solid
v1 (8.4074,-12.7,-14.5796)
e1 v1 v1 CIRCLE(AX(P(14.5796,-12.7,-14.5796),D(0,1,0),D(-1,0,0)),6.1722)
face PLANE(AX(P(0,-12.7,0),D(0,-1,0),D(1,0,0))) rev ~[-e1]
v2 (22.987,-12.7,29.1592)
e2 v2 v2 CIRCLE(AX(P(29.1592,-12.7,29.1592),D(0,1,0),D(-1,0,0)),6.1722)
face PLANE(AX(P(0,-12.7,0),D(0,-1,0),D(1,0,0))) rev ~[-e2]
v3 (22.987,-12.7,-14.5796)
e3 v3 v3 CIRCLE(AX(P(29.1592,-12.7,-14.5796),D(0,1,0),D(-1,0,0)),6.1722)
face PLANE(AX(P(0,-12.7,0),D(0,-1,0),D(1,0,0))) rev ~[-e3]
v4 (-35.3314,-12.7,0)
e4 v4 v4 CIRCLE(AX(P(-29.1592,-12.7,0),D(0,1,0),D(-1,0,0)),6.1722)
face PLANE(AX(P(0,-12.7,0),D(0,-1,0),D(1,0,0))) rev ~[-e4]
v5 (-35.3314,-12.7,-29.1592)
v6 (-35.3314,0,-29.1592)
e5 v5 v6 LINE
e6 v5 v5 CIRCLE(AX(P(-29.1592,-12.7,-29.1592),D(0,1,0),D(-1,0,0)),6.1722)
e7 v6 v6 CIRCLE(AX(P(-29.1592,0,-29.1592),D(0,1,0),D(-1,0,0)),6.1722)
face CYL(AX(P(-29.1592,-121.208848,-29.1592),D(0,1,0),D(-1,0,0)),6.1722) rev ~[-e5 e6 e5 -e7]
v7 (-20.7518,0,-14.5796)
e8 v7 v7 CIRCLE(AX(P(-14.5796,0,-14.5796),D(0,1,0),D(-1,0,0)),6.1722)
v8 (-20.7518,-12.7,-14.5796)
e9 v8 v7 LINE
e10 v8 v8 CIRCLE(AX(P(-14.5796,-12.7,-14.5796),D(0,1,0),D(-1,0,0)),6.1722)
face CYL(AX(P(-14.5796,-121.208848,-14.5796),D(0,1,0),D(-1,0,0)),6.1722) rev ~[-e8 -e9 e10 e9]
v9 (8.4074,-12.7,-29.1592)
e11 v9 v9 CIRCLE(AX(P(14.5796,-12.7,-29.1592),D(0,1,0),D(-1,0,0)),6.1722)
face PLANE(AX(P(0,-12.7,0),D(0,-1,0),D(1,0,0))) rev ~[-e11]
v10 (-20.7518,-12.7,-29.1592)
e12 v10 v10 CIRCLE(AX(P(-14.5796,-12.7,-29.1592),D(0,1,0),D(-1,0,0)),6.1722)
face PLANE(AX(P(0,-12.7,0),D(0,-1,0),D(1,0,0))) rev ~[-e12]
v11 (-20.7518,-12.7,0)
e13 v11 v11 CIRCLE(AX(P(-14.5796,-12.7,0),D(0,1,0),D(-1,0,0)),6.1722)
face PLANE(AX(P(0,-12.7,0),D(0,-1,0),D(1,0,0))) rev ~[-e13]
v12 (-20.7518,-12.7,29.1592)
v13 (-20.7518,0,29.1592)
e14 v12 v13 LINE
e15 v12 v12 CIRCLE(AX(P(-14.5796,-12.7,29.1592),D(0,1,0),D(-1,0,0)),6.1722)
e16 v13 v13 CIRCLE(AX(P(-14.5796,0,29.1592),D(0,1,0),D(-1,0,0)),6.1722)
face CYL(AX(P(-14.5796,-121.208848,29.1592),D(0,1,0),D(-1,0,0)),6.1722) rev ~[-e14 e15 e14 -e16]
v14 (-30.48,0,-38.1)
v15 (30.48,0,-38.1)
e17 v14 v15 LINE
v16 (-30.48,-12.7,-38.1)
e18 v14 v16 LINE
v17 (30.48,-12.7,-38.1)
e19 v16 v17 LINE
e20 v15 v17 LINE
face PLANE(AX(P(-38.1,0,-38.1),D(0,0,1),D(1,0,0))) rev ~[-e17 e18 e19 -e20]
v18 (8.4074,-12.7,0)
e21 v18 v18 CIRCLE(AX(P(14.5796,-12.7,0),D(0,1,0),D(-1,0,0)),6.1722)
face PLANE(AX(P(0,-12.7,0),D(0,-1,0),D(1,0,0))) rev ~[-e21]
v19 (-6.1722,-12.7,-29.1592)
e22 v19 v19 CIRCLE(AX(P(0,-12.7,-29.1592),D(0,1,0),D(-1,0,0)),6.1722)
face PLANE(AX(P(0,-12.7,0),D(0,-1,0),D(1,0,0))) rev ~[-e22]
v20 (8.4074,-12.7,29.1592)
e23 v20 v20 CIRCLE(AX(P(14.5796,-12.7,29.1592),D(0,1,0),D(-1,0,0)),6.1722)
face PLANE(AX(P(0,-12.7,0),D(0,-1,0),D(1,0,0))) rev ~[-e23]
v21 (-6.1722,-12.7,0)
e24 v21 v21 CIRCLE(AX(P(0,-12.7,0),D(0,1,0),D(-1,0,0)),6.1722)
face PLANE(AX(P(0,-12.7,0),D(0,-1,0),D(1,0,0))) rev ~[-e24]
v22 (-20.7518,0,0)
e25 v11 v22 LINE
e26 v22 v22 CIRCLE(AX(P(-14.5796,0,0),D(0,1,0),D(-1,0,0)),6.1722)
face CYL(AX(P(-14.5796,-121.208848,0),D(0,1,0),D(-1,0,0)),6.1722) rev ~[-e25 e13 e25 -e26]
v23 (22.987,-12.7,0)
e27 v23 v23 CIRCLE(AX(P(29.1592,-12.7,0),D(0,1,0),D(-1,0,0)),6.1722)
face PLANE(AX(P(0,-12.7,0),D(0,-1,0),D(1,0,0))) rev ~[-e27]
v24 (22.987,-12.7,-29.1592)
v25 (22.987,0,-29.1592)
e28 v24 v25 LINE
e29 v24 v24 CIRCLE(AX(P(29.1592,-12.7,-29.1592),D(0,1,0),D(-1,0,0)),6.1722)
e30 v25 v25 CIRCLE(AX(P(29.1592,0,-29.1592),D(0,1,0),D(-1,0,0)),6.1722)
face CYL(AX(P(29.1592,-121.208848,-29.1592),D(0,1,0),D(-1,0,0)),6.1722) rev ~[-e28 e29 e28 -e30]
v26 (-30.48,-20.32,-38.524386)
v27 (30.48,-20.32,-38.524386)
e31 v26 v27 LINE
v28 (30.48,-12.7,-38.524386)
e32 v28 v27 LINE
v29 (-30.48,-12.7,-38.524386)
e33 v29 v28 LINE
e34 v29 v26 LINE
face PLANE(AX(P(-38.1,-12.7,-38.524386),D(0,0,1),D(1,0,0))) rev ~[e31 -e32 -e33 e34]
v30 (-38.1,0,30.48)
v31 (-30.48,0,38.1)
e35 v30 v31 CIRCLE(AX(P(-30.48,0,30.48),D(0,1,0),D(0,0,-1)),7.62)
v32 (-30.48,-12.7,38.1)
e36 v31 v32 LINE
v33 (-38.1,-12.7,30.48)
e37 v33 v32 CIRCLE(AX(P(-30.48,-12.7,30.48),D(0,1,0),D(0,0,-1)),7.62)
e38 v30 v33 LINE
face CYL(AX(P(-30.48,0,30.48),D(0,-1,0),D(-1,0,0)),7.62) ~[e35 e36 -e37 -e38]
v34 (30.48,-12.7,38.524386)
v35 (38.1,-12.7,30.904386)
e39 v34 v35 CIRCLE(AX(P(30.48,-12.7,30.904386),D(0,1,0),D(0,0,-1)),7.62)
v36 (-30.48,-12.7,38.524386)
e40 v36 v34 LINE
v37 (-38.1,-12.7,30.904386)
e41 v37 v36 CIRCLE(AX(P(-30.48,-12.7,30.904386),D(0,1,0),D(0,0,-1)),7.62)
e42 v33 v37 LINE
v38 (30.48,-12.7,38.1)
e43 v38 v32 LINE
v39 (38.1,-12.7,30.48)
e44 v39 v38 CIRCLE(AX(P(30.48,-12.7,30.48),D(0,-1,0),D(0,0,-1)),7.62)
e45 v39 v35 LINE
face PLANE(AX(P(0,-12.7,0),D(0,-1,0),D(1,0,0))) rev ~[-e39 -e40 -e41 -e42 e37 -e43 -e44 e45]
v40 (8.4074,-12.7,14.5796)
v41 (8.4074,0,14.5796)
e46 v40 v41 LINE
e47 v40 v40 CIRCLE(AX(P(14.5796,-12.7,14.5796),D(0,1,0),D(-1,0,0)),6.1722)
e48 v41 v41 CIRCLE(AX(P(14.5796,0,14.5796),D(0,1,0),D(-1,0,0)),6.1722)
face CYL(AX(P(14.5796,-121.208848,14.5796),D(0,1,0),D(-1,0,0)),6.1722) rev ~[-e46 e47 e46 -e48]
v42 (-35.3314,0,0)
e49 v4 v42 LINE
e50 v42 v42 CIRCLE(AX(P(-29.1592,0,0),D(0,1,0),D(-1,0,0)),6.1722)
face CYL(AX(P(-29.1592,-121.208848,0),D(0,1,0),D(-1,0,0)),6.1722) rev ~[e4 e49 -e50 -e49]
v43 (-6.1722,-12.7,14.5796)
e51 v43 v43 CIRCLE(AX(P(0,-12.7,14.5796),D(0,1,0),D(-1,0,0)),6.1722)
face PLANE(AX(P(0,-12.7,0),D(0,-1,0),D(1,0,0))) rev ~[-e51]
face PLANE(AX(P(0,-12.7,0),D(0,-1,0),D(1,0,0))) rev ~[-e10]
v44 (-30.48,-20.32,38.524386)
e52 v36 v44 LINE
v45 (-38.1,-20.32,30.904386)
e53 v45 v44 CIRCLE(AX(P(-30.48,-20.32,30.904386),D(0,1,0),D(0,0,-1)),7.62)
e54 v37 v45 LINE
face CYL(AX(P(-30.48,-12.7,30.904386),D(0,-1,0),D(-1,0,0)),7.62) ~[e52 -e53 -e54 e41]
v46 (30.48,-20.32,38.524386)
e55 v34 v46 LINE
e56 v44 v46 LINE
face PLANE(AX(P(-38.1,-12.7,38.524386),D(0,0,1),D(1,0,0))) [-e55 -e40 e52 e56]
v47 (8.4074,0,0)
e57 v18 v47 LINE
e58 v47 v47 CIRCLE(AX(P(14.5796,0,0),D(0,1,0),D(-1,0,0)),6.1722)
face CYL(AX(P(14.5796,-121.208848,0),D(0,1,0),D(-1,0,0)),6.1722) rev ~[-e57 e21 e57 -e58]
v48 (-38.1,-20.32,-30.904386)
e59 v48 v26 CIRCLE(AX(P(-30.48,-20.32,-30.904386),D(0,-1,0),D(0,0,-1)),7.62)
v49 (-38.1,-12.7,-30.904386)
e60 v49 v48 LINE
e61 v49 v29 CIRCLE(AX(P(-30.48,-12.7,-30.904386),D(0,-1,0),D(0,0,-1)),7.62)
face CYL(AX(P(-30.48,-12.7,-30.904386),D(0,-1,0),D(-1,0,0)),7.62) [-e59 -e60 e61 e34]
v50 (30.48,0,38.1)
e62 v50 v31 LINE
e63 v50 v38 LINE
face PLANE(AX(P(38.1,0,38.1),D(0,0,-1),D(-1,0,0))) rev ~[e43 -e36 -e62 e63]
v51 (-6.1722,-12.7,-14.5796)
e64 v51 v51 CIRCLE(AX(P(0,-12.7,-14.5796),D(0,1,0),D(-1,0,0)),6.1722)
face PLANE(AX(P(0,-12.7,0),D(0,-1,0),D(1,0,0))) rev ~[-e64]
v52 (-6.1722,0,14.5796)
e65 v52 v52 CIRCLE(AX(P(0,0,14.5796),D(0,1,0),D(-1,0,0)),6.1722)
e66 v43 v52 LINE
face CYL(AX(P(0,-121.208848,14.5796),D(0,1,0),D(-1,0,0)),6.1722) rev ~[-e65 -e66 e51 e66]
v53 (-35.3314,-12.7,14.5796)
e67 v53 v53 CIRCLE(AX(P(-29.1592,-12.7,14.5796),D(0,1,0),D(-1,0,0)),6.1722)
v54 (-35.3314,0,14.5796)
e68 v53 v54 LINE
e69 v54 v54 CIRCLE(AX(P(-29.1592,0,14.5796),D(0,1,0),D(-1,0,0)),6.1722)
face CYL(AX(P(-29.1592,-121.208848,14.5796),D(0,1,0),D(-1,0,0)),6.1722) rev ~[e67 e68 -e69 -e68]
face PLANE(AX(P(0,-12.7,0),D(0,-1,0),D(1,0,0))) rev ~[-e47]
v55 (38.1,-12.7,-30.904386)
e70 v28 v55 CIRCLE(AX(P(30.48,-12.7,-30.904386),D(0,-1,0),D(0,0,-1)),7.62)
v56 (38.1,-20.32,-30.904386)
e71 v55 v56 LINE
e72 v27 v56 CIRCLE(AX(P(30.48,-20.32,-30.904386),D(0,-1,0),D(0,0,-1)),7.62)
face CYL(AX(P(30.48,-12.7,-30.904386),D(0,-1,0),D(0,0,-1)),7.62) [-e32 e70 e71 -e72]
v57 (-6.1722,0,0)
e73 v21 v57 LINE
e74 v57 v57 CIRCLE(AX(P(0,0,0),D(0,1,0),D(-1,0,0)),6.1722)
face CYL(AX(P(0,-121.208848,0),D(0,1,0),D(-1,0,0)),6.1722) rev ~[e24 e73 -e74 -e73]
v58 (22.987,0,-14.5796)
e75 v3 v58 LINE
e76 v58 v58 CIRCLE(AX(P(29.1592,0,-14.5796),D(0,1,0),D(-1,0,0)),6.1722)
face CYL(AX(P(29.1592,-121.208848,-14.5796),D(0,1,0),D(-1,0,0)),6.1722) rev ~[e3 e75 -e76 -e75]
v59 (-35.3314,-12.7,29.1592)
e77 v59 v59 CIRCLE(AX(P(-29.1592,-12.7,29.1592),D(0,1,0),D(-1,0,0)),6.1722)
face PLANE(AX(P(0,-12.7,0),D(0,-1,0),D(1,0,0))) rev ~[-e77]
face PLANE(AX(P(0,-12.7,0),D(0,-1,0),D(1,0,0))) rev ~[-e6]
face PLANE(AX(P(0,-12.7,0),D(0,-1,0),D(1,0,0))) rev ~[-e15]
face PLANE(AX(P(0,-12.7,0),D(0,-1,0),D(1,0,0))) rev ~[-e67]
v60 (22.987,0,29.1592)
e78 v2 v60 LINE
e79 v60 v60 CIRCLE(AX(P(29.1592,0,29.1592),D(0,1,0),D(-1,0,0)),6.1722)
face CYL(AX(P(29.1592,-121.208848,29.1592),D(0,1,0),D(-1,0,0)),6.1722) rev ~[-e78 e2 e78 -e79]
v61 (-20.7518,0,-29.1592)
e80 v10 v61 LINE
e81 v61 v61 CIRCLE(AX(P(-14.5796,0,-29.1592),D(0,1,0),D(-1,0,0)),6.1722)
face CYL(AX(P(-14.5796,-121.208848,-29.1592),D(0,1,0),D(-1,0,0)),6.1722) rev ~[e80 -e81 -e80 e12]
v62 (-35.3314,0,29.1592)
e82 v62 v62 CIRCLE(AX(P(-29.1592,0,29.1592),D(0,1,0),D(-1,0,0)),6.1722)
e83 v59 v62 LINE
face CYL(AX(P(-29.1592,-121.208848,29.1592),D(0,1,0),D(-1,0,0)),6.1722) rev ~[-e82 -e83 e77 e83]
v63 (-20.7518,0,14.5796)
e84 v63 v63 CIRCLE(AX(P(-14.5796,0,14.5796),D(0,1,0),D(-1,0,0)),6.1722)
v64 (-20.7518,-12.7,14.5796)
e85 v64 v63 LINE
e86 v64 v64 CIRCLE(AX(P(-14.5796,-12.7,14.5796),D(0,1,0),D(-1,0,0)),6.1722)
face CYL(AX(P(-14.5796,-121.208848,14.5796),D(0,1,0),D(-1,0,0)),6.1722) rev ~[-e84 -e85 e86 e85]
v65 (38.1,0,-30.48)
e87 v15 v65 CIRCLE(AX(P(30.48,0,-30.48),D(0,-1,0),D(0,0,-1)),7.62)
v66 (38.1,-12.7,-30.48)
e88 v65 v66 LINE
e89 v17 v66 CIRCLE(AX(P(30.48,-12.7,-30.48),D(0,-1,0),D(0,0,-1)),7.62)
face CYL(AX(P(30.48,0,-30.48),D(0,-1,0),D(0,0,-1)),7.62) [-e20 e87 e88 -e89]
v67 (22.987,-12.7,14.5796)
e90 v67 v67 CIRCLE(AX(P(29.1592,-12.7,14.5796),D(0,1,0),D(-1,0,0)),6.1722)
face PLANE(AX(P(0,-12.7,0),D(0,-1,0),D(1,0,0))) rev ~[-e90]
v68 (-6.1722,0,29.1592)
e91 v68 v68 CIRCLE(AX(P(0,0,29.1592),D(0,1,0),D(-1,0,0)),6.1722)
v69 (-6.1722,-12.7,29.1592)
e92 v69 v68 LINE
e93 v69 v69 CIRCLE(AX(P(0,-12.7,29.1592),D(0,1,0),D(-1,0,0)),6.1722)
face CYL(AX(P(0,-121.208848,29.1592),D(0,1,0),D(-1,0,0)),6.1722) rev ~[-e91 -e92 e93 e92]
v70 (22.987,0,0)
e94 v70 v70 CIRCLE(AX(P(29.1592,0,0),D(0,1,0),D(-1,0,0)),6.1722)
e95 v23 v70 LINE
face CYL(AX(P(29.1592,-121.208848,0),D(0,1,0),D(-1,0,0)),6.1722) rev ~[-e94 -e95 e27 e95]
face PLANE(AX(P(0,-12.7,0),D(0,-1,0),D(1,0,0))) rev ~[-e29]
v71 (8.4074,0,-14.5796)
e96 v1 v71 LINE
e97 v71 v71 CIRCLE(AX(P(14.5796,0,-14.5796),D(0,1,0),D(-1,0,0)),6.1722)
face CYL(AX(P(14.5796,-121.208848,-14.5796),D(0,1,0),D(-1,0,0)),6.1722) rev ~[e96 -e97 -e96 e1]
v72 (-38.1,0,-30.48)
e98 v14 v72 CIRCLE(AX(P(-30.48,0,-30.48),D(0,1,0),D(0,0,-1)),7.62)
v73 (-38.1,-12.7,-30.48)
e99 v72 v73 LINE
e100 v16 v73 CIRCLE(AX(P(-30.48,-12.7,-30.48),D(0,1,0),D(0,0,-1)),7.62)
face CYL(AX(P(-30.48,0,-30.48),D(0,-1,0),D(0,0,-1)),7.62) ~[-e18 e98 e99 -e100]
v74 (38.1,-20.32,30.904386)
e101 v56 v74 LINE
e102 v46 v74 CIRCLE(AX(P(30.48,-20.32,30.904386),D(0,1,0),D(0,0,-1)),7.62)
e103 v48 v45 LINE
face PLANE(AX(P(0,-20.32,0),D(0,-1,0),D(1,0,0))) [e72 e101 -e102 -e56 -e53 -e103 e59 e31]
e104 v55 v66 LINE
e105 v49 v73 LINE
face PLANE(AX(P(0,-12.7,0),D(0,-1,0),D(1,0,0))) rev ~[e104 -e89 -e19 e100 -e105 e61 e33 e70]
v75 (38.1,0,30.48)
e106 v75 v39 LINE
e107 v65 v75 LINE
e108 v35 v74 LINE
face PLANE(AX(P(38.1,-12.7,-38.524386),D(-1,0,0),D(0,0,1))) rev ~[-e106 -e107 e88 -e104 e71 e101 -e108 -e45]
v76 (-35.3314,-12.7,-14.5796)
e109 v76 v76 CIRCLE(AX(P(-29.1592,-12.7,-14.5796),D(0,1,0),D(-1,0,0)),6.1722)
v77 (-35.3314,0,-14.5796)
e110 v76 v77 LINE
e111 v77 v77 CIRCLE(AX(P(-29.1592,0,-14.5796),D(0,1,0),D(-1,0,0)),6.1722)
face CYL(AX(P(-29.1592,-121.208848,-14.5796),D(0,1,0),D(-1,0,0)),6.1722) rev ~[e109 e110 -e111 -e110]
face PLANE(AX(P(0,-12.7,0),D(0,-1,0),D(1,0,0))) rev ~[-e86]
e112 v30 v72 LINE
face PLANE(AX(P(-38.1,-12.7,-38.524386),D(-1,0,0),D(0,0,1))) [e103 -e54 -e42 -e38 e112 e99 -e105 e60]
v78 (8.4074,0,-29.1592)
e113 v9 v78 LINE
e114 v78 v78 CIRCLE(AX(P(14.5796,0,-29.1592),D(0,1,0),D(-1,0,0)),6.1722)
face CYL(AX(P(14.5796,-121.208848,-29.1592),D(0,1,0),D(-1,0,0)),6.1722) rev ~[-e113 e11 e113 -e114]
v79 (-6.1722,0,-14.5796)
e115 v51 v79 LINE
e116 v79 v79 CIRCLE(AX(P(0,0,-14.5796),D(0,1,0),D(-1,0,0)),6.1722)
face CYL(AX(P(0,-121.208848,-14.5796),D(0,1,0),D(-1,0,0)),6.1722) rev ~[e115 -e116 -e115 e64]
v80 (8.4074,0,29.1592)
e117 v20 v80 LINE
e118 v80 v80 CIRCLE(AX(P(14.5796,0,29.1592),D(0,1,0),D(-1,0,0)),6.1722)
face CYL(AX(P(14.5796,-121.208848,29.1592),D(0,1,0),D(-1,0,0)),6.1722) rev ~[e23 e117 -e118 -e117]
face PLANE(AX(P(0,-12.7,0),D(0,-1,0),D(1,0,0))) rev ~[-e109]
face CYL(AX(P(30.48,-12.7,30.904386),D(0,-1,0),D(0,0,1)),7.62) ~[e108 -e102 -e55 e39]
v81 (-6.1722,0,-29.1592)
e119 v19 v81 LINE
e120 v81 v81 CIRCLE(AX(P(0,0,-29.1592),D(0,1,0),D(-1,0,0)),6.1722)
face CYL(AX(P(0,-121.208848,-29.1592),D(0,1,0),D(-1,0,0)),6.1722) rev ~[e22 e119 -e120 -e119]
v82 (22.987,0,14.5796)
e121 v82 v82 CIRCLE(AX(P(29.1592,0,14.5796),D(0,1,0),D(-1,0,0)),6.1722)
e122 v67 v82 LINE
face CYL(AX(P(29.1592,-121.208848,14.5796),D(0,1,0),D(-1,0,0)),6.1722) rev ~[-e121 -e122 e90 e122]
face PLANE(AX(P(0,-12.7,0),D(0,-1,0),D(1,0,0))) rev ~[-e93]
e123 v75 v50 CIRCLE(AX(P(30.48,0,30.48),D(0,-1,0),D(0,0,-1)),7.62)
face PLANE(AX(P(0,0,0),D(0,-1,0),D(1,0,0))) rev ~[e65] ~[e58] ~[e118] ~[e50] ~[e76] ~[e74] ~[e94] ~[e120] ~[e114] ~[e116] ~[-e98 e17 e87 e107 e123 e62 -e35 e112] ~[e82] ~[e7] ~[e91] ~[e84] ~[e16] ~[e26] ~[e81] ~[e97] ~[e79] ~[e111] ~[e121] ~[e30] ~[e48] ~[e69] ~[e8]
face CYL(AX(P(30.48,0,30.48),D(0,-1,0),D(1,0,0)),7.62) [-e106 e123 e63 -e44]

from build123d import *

# Parameters (mm, degrees)
F1_DEPTH = 12.7
F3_D     = 12.3444
F4_R     = 7.62
F5_W     = 76.2
F5_H     = 77.0487710834
F6_DEPTH = 7.62
F7_R     = 7.62


# Not quite as in the source:
# - a feature names something its author has since deleted; it is built from what else it names


with BuildPart() as f1:
    # F0 (on Front) → F1 (new body)
    with BuildSketch(Plane.XZ):
        Polygon((-38.1, -38.1), (38.1, -38.1), (38.1, -30.48), (38.1, 38.1), (-38.1, 38.1), align=None)
    extrude(amount=F1_DEPTH)

    # F3 (through all)
    with Locations(Plane.XZ.offset(12.7)):
        with Locations((-29.1592, 29.1592), (-14.5796, 29.1592), (0, 29.1592), (14.5796, 29.1592), (29.1592, 29.1592), (29.1592, 14.5796), (29.1592, 0), (29.1592, -14.5796), (29.1592, -29.1592), (14.5796, -29.1592), (14.5796, -14.5796), (14.5796, 0), (14.5796, 14.5796), (0, 14.5796), (0, 0), (0, -14.5796), (0, -29.1592), (-14.5796, -29.1592), (-14.5796, -14.5796), (-14.5796, 0), (-14.5796, 14.5796), (-29.1592, 14.5796), (-29.1592, 0), (-29.1592, -14.5796), (-29.1592, -29.1592)):
            Hole(F3_D / 2)

    # F4
    f4_edges = [f1.edges().sort_by_distance(p)[0] for p in [
        (-38.1, -6.35, 38.1),
        (38.1, -6.35, 38.1),
        (38.1, -6.35, -38.1),
        (-38.1, -6.35, -38.1),
    ]]
    fillet(f4_edges, radius=F4_R)

    # F5 (on face) → F6 (join)
    with BuildSketch(Plane.XZ.offset(12.7)):
        Rectangle(F5_W, F5_H)
    extrude(amount=F6_DEPTH)

    # F7
    f7_edges = [f1.edges().sort_by_distance(p)[0] for p in [
        (-38.1, -16.51, 38.524386),
        (38.1, -16.51, 38.524386),
        (38.1, -16.51, -38.524386),
        (-38.1, -16.51, -38.524386),
    ]]
    fillet(f7_edges, radius=F7_R)


solid = f1.part
